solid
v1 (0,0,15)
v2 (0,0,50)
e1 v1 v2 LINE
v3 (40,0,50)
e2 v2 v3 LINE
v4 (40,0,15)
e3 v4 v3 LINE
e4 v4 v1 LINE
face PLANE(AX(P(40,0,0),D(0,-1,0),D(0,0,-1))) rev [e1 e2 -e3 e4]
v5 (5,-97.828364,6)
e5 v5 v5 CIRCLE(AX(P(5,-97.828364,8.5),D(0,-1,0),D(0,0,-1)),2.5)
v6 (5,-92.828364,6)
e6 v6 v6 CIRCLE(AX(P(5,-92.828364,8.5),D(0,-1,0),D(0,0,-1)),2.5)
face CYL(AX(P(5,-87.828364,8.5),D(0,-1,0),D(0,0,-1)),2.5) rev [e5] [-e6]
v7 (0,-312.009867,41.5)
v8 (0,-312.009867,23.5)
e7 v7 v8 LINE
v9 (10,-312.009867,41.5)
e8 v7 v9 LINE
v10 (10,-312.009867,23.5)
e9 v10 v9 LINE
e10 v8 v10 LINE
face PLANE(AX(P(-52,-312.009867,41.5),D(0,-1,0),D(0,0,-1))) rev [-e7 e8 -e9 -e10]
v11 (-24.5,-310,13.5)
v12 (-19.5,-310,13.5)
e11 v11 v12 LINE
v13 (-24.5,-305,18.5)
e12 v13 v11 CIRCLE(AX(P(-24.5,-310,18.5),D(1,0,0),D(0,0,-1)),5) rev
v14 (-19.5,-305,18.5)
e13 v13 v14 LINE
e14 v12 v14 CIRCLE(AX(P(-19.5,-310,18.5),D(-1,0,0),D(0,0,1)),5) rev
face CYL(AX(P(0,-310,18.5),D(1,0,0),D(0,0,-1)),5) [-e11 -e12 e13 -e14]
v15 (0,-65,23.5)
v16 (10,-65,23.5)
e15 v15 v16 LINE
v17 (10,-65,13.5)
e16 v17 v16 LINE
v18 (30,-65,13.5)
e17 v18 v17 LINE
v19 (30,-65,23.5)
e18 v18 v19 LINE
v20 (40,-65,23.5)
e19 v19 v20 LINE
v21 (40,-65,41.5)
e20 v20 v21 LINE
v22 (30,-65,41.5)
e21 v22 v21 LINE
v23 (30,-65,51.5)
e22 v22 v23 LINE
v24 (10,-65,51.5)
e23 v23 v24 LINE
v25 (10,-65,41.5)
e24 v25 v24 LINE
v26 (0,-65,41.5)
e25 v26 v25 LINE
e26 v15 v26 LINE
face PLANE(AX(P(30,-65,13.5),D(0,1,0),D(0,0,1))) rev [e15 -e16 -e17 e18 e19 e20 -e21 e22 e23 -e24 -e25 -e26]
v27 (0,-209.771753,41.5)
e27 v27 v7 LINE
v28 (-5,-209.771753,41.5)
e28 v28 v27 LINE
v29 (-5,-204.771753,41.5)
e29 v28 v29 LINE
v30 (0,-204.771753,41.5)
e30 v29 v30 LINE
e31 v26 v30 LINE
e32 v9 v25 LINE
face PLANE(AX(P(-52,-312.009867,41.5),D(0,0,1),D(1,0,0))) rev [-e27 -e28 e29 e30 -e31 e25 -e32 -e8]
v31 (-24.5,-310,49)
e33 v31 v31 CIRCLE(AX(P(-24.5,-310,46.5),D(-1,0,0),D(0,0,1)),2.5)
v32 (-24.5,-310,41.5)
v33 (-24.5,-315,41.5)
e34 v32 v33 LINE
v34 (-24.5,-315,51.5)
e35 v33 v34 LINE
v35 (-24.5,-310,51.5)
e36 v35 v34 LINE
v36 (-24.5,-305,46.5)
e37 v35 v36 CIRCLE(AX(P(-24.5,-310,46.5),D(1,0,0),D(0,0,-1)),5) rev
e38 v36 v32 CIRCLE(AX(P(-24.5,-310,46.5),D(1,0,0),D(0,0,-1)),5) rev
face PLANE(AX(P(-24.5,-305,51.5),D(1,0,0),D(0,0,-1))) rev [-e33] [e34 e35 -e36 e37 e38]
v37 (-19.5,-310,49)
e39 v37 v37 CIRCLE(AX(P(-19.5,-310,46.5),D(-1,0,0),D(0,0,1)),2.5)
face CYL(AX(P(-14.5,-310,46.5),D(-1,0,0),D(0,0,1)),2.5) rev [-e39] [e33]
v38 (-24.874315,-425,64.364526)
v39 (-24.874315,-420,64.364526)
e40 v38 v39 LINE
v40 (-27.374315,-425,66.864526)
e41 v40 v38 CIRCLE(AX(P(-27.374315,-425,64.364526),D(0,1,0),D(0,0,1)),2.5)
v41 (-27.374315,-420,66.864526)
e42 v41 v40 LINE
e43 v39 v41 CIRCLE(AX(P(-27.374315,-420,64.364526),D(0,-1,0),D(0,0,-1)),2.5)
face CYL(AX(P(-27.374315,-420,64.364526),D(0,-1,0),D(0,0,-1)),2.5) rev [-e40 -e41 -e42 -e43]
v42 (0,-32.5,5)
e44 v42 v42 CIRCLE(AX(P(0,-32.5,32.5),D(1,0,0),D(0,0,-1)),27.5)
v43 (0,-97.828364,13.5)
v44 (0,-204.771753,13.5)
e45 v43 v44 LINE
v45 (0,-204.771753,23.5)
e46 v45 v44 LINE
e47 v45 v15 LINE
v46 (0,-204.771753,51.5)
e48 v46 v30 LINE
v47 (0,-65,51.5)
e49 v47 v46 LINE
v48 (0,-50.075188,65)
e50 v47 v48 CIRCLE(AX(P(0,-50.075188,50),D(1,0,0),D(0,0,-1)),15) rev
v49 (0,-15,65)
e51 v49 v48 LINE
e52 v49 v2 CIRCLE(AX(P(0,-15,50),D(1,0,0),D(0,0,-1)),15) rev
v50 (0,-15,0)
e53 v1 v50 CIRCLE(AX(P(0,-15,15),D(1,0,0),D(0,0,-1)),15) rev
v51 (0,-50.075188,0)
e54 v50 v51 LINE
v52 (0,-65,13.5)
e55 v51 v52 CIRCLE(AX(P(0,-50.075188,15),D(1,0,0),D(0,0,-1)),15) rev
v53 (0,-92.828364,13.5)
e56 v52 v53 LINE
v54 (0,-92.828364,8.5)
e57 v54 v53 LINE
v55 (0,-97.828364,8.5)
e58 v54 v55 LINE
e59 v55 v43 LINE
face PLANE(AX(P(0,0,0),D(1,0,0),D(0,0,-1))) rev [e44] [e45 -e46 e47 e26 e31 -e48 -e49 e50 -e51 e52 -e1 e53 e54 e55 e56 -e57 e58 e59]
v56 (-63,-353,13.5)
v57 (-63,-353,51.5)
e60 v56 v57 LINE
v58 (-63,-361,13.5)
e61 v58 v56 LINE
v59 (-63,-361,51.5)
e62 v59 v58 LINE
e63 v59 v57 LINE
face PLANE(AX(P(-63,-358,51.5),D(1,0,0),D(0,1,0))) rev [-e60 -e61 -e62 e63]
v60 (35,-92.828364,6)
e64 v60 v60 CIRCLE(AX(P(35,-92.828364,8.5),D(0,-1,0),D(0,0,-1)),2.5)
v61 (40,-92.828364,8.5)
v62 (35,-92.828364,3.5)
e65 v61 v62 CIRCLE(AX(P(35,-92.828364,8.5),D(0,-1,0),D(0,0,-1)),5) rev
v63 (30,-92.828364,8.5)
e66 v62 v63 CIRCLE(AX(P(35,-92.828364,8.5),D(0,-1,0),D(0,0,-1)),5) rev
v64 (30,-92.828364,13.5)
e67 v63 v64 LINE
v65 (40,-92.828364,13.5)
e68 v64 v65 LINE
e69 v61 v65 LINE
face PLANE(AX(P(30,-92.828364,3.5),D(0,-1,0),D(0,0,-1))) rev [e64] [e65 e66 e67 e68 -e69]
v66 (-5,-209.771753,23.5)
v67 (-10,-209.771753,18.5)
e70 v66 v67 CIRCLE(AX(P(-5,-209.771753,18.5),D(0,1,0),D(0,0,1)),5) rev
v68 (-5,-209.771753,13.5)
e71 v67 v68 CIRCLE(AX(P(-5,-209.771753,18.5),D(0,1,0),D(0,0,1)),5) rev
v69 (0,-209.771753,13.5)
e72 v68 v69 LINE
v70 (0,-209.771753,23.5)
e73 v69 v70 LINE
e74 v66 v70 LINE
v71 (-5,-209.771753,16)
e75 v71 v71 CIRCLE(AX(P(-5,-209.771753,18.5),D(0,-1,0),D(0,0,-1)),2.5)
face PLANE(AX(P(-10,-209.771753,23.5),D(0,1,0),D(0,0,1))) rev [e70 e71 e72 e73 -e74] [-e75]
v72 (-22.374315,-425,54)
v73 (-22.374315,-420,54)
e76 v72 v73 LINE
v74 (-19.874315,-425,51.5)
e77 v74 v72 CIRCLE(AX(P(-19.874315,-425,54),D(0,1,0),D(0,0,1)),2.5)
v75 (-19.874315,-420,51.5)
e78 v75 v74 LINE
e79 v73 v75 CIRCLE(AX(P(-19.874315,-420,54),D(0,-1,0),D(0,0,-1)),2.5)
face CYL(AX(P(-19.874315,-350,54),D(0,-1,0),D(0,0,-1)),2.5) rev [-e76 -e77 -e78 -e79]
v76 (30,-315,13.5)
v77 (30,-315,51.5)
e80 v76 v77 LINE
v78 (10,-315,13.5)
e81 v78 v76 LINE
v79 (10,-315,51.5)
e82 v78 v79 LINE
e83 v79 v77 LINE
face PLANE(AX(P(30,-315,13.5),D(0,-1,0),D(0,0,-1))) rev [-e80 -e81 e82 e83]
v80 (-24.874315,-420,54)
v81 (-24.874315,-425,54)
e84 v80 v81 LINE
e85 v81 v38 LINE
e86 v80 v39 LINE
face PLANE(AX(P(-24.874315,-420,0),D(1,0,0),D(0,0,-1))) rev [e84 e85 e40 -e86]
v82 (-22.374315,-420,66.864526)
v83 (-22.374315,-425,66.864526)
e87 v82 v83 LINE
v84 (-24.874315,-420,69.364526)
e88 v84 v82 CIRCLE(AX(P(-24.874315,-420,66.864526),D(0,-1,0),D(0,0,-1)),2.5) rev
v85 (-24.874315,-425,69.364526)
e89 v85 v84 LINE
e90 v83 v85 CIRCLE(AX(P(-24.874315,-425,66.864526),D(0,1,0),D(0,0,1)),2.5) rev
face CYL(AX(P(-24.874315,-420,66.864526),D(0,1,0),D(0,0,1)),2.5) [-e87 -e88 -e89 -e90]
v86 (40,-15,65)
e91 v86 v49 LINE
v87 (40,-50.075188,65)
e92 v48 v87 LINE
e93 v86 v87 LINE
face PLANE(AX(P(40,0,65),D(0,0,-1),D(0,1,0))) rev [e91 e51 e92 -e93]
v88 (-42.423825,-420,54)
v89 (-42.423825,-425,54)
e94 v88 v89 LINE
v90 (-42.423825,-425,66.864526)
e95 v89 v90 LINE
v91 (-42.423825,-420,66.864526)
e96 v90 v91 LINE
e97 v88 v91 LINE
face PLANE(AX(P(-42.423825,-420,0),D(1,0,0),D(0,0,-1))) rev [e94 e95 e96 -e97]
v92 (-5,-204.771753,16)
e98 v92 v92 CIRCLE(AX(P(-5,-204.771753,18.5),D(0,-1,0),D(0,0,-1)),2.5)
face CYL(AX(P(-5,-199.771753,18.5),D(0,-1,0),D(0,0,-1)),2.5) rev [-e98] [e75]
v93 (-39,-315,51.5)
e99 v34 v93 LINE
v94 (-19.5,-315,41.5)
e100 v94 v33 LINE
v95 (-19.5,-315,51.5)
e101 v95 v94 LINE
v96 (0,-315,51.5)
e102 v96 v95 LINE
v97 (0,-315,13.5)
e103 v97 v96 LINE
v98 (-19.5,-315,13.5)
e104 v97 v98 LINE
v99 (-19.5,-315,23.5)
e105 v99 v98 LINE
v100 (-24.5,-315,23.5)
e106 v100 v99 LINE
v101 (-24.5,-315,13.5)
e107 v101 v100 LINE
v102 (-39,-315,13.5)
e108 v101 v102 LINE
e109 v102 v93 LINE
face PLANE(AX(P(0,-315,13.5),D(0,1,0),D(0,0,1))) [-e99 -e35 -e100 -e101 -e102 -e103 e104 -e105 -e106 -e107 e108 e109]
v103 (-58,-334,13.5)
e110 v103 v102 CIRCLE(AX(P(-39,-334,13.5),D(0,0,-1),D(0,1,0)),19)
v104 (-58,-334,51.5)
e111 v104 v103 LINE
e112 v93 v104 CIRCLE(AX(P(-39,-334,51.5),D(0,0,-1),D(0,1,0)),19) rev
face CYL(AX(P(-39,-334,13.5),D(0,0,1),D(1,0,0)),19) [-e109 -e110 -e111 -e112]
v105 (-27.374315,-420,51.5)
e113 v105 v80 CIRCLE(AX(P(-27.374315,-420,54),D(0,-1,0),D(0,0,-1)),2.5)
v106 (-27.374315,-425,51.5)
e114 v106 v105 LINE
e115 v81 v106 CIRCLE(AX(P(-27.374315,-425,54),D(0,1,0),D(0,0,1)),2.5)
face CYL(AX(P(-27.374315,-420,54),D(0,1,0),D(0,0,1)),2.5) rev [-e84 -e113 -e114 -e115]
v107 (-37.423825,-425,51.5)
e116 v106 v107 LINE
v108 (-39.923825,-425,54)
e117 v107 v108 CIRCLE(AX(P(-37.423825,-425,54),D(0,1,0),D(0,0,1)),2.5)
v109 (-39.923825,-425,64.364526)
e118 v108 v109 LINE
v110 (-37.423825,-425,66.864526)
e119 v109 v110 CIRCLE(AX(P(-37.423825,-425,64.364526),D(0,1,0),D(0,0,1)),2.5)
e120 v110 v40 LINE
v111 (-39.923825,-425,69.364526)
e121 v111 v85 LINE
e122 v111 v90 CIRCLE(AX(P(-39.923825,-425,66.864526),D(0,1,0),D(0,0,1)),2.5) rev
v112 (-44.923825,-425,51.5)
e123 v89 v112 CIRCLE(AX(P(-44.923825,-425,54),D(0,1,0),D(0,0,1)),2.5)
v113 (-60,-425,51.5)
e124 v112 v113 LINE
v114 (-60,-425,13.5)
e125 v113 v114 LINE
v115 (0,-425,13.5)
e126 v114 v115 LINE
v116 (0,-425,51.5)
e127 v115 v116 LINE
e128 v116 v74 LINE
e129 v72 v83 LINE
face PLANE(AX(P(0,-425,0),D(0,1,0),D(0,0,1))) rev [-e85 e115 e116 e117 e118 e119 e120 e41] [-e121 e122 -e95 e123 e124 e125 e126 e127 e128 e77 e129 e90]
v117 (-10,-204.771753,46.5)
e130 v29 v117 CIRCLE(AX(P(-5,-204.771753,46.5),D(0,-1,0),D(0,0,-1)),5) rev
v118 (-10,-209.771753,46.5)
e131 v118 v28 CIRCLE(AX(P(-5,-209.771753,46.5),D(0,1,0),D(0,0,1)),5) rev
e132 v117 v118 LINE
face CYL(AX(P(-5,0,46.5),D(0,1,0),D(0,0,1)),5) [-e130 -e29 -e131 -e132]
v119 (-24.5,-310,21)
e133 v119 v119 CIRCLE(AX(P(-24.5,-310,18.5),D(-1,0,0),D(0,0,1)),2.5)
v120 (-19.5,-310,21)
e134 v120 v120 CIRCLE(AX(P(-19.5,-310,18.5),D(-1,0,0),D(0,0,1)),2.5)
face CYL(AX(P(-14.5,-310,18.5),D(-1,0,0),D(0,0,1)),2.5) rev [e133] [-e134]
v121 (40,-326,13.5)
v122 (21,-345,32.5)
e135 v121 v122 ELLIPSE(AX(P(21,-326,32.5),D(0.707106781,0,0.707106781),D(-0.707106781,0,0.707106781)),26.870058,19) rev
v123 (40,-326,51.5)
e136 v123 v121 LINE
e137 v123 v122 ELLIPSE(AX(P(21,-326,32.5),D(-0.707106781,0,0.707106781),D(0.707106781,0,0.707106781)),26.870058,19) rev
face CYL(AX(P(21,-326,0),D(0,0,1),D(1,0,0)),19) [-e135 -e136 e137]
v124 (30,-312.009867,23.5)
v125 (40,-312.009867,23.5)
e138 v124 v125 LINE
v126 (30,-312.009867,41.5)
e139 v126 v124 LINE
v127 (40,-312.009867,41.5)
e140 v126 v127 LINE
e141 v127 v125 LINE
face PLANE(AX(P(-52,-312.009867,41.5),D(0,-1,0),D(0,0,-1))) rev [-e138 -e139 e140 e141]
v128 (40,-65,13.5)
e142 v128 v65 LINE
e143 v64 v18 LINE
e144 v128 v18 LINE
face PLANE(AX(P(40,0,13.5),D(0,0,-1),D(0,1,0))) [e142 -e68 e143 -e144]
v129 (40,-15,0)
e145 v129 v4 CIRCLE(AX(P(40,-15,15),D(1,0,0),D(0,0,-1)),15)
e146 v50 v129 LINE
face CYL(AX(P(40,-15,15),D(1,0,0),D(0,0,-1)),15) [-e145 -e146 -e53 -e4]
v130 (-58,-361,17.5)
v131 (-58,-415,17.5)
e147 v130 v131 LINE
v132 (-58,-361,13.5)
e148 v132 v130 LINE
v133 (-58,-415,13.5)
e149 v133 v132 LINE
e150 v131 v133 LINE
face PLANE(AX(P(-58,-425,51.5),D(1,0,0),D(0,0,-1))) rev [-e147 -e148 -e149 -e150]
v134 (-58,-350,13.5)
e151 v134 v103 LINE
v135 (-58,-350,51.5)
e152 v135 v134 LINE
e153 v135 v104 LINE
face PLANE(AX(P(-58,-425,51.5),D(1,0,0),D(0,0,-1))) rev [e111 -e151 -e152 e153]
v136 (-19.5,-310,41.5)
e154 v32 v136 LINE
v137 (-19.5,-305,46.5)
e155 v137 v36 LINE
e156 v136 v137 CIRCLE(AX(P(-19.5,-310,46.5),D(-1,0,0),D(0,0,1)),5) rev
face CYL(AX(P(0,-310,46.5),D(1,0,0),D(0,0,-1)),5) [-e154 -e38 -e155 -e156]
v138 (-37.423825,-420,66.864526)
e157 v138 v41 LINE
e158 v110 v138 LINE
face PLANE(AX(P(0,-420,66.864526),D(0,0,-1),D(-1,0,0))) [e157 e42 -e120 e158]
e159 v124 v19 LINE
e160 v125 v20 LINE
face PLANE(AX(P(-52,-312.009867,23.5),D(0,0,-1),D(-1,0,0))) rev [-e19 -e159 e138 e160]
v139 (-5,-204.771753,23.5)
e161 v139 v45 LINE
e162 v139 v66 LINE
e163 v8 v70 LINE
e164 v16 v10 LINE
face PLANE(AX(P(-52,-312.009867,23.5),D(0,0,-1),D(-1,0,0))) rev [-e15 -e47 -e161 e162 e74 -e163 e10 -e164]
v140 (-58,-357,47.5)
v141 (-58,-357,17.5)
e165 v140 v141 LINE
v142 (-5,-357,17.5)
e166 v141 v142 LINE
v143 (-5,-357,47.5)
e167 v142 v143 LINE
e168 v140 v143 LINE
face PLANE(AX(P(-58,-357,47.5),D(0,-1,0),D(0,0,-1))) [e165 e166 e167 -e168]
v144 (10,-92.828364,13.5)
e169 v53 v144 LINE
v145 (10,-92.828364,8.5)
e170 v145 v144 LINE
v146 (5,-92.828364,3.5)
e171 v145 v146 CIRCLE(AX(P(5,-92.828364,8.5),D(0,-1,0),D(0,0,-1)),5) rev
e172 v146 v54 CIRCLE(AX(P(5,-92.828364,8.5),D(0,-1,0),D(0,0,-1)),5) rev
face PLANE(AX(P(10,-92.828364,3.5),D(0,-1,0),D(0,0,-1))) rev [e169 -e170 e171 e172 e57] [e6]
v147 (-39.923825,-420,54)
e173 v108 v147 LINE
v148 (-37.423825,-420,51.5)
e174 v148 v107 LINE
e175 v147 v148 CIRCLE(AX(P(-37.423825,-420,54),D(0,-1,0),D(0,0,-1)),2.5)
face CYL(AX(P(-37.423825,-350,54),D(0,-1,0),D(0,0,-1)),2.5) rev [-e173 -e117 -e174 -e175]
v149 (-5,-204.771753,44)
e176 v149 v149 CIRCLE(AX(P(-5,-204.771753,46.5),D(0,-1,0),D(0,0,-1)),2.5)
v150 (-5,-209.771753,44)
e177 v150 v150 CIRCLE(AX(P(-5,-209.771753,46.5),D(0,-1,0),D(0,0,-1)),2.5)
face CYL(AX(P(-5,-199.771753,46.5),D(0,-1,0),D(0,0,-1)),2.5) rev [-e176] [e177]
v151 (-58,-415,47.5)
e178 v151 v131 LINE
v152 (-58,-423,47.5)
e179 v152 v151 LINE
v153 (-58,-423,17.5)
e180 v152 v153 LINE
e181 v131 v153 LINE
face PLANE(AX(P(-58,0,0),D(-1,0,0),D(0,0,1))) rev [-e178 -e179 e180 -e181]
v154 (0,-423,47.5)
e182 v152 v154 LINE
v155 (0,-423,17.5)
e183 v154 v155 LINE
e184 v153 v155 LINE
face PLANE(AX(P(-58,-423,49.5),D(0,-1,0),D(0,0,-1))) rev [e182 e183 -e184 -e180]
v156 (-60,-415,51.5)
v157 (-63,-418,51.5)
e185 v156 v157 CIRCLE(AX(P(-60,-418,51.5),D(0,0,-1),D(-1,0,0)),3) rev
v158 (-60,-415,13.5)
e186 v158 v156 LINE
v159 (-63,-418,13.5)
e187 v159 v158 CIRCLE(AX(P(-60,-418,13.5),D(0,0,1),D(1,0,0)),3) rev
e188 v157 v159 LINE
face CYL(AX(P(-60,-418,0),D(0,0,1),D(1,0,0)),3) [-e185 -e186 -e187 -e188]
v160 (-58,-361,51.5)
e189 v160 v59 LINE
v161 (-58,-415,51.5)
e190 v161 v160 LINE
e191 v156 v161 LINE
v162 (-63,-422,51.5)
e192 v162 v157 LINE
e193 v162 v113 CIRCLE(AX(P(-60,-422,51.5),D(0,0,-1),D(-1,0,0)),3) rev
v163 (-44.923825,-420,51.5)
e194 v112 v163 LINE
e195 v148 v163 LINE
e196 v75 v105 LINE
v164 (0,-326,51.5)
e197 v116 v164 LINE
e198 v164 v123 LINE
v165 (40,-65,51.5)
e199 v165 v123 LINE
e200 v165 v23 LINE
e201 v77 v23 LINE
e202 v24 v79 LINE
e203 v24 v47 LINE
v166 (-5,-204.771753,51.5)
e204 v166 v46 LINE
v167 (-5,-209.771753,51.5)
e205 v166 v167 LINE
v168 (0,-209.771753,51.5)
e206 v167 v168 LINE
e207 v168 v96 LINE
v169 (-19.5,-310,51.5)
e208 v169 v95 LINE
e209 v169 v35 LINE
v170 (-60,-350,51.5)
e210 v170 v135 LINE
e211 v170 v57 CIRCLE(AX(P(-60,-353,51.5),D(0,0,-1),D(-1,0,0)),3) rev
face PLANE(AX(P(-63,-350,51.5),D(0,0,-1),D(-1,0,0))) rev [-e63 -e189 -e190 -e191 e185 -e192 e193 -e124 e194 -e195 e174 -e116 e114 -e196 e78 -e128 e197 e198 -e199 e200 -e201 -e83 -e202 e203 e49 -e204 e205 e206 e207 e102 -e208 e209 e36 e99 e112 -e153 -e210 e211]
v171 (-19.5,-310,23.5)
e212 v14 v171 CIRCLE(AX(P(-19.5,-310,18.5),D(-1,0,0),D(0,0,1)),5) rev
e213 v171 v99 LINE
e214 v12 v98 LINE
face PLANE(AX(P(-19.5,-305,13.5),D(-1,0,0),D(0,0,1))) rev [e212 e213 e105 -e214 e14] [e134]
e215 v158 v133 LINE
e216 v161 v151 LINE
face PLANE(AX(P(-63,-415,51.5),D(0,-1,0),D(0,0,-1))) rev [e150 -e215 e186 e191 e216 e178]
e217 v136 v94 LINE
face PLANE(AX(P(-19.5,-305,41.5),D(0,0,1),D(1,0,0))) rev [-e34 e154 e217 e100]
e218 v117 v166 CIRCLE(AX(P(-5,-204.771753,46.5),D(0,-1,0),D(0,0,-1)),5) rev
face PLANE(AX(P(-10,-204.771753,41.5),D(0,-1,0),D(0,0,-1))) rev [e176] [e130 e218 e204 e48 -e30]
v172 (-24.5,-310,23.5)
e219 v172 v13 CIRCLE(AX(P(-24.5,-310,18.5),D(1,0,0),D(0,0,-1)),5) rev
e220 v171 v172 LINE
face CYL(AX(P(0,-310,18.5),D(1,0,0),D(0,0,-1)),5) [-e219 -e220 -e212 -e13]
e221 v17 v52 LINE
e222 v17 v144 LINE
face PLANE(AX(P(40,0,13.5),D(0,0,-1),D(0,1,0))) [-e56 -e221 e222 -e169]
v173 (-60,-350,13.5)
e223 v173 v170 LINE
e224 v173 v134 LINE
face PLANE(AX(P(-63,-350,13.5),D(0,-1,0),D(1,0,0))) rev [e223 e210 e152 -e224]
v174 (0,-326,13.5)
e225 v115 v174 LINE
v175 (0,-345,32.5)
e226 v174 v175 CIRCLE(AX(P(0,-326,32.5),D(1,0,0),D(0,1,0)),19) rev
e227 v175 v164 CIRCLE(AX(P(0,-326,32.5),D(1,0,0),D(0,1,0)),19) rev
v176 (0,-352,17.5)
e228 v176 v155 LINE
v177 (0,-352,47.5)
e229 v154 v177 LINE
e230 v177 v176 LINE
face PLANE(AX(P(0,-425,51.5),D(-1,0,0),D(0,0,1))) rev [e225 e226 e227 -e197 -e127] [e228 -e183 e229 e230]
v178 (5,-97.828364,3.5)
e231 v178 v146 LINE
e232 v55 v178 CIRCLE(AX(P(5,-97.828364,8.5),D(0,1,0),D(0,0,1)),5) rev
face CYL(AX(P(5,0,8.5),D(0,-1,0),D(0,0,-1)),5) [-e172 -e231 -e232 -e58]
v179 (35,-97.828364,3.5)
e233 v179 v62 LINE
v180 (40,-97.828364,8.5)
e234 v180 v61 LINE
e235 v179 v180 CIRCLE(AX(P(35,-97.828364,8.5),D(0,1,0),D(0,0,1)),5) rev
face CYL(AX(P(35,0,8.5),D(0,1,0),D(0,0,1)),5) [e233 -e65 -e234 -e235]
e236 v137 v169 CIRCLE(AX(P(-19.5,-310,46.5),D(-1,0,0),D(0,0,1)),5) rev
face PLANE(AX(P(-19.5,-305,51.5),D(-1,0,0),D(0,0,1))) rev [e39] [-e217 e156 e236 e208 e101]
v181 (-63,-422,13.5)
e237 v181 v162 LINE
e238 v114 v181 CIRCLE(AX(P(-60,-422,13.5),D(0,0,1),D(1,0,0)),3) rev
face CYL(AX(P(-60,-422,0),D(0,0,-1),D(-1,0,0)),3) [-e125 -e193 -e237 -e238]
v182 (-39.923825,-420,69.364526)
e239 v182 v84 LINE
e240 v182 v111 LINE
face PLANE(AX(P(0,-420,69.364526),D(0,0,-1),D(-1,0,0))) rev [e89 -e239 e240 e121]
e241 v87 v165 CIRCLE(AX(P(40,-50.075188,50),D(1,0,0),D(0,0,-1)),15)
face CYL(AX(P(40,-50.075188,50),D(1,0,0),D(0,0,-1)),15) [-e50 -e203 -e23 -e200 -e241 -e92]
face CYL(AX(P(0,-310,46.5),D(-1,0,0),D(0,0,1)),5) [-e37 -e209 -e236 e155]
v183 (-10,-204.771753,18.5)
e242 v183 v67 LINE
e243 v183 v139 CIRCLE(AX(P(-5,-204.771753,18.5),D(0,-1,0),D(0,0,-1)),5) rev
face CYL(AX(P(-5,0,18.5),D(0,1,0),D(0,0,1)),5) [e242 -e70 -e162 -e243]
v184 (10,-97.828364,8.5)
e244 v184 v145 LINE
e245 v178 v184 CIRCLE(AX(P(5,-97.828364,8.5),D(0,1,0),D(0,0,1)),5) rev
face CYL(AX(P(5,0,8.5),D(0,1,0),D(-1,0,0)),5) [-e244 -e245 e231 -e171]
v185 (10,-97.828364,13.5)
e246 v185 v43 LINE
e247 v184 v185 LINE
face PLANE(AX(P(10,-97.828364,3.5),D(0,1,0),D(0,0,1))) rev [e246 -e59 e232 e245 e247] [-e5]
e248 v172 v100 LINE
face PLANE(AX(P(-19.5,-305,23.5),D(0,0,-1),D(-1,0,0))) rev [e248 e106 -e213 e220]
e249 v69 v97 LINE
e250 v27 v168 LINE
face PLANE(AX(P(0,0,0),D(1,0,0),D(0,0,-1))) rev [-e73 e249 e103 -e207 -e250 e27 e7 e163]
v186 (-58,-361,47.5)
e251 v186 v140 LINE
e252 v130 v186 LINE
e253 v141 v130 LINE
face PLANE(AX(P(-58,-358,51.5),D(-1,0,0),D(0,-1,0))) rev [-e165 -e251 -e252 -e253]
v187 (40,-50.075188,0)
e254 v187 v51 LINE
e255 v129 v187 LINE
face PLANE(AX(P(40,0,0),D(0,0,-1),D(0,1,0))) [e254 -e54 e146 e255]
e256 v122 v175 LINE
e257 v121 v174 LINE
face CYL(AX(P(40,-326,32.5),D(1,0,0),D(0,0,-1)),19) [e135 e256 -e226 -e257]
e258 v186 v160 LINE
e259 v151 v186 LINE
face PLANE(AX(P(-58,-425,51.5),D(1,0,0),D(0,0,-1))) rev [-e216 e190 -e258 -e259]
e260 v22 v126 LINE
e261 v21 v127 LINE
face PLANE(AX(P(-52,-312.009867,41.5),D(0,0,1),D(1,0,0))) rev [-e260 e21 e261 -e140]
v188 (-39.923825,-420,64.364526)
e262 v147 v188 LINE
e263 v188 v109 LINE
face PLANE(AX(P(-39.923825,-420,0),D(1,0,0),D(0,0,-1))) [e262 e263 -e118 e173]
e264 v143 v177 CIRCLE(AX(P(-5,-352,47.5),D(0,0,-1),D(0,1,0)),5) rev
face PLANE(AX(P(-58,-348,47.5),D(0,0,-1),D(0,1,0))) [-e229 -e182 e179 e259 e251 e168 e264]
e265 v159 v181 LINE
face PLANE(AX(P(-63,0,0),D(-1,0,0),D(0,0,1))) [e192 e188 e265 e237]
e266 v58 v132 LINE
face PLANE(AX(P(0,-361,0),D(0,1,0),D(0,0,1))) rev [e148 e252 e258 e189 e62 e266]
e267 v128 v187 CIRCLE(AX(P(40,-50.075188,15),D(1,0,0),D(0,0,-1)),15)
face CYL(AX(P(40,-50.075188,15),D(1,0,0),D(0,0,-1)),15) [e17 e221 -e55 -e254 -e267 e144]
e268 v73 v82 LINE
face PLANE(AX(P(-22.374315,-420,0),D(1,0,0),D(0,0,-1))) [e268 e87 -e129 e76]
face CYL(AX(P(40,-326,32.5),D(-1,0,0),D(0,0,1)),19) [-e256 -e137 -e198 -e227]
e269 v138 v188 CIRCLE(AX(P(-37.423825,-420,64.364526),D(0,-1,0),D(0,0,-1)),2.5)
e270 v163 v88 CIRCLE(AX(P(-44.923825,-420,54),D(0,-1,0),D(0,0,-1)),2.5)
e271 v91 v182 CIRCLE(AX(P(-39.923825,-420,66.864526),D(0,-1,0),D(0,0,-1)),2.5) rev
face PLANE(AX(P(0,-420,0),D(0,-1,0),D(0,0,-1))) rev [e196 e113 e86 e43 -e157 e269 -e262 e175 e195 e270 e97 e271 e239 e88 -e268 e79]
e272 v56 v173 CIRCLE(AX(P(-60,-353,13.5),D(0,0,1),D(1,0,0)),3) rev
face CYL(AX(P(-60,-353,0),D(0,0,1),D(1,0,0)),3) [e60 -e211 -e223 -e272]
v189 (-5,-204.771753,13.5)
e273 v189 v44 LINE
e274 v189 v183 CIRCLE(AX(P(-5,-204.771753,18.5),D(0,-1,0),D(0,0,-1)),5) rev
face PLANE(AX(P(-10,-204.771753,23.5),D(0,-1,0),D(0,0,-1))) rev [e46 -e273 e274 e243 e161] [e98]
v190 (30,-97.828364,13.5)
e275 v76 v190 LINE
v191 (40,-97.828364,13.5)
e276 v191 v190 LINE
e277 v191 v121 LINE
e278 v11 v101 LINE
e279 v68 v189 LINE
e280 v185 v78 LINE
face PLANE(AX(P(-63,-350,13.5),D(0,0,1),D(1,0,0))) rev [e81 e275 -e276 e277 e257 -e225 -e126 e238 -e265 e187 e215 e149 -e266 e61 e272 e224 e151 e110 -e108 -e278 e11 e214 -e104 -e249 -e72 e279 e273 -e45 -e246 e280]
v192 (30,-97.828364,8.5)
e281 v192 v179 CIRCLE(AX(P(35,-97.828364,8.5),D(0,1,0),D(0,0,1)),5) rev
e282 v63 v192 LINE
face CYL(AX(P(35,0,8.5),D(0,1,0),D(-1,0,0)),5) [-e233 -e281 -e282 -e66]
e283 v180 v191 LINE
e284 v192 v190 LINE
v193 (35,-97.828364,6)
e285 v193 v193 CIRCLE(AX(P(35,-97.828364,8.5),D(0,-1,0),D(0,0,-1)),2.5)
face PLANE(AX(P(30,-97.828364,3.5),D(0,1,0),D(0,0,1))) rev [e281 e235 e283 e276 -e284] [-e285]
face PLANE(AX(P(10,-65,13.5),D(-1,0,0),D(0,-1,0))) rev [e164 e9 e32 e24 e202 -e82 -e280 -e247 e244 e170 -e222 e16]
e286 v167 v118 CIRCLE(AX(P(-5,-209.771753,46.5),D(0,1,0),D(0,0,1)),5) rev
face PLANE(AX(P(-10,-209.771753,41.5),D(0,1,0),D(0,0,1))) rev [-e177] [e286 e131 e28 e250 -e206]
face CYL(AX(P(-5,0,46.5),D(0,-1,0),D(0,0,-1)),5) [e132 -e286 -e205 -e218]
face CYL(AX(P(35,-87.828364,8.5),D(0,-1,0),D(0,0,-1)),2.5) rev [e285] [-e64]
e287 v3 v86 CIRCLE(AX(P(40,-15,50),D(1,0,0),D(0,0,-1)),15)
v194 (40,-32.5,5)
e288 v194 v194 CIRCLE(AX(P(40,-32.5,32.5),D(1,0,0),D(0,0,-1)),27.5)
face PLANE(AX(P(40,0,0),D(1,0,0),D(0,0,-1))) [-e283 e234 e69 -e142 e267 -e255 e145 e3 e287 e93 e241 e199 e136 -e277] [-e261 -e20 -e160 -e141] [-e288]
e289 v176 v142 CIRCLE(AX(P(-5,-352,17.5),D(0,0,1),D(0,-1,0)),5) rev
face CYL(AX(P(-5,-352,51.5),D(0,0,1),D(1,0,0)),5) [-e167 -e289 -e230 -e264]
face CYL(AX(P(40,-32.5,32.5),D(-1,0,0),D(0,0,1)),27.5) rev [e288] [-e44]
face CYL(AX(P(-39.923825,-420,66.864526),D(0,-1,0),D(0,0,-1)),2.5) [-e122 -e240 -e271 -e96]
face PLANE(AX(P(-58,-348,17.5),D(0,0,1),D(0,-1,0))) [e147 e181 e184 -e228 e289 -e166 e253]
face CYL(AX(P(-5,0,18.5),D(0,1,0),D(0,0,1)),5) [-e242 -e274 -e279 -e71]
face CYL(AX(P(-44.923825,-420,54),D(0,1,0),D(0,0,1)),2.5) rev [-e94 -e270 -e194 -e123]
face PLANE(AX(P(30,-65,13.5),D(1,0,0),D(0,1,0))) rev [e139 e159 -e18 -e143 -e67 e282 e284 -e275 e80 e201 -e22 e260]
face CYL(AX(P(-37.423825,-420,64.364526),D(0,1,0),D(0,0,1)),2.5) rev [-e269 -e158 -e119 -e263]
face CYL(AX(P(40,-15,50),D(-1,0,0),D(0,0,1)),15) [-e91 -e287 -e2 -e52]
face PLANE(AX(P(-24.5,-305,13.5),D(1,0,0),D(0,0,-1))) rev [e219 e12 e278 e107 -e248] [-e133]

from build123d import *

# Parameters (mm, degrees)
SKETCH1_W              = 65
SKETCH1_H              = 65
SKETCH1_R              = 27.5
SKETCH1_W_2            = 38
SKETCH1_H_2            = 280
BOSS_EXTRUDE1_DEPTH    = 40
FILLET1_R              = 15
SKETCH2_W              = 58
SKETCH2_H              = 100
BOSS_EXTRUDE2_DEPTH    = 38
FILLET2_R              = 19
SKETCH3_W              = 20
SKETCH3_H              = 250
CUT_EXTRUDE1_DEPTH     = 38
SKETCH4_W              = 18
SKETCH4_H              = 247.009867417
CUT_EXTRUDE2_DEPTH     = 92
SKETCH5_W              = 28
SKETCH5_H              = 60
CUT_EXTRUDE3_DEPTH     = 58
SKETCH6_W              = 38
SKETCH6_H              = 3
BOSS_EXTRUDE11_DEPTH   = 5
BOSS_EXTRUDE11_2_DEPTH = 5
FILLET3_R              = 3
FILLET4_R              = 3
SKETCH7_W              = 10
SKETCH7_H              = 5
BOSS_EXTRUDE14_DEPTH   = 10
SKETCH8_R              = 2.5
CUT_EXTRUDE4_DEPTH     = 10
FILLET5_R              = 5
SKETCH9_W              = 10
SKETCH9_H              = 5
BOSS_EXTRUDE15_DEPTH   = 10
FILLET6_R              = 5
SKETCH10_R             = 2.5
CUT_EXTRUDE5_DEPTH     = 10
SKETCH11_W             = 5
SKETCH11_H             = 10
BOSS_EXTRUDE16_DEPTH   = 10
FILLET7_R              = 5
SKETCH12_R             = 2.5
CUT_EXTRUDE7_DEPTH     = 10
FILLET9_R              = 2
SKETCH13_W             = 35.831314296
SKETCH13_H             = 60.586089769
CUT_EXTRUDE8_DEPTH     = 10
SKETCH14_W             = 58
SKETCH14_H             = 38
CUT_EXTRUDE9_DEPTH     = 70
SKETCH15_W             = 58
SKETCH15_H             = 38
BOSS_EXTRUDE17_DEPTH   = 80
SKETCH16_W             = 34
SKETCH16_H             = 70
CUT_EXTRUDE10_DEPTH    = 58
SKETCH17_W             = 5
SKETCH17_H             = 38
BOSS_EXTRUDE18_DEPTH   = 5
SKETCH18_W             = 38
SKETCH18_H             = 10
BOSS_EXTRUDE19_DEPTH   = 5
FILLET10_R             = 3
FILLET11_R             = 5
SKETCH19_W             = 2
SKETCH19_H             = 75
BOSS_EXTRUDE22_DEPTH   = 58
SKETCH26_W             = 30
SKETCH26_H             = 9
BOSS_EXTRUDE23_DEPTH   = 58
FILLET12_R             = 5
SKETCH27_W             = 5
SKETCH27_H             = 38
BOSS_EXTRUDE24_DEPTH   = 3
BOSS_EXTRUDE26_DEPTH   = 5
FILLET13_R             = 2.5
FILLET14_R             = 2.5


# Some blends are built 0.0001 mm under size
with BuildPart() as part:
    # Sketch1 → Boss-Extrude1 (new body)
    # profile 1 of 2: a face of its own
    with BuildSketch(Plane(origin=(0, 0, 0), x_dir=(0, 0, -1), z_dir=(1, 0, 0))):
        with Locations((-32.5, -32.5)):
            Rectangle(SKETCH1_W, SKETCH1_H)
        with Locations((-32.5, -32.5)):
            Circle(SKETCH1_R, mode=Mode.SUBTRACT)
    # profile 2 of 2: a face of its own
    with BuildSketch(Plane(origin=(0, 0, 0), x_dir=(0, 0, -1), z_dir=(1, 0, 0))):
        with Locations((-32.5, -205)):
            Rectangle(SKETCH1_W_2, SKETCH1_H_2)
    extrude(amount=BOSS_EXTRUDE1_DEPTH)

    # Fillet1
    # the kernel refuses this fillet: 15 mm, written as the material it takes off along each edge
    with BuildSketch(Plane(origin=(-37.312028891, -65, 0), x_dir=(0, 1, 0), z_dir=(1, 0, 0))) as fillet1_piece_1:
        with BuildLine():
            CenterArc((14.924811557, 15), FILLET1_R, 185.739170477, 84.260829523)
            Line((0, 13.5), (-0.298496231, 13.47))
            ThreePointArc((-0.298496231, 13.47), (-0.3, 6.75), (-0.3, 0))
            Line((-0.3, 0), (0, -0.3))
            Line((0, -0.3), (14.924811557, -0.3))
            Line((14.924811557, -0.3), (14.924811557, 0))
        make_face()
    extrude(amount=114.624057783, mode=Mode.SUBTRACT)
    with BuildSketch(Plane(origin=(-37.312028891, -65, 65), x_dir=(0, 1, 0), z_dir=(1, 0, 0))) as fillet1_piece_2:
        with BuildLine():
            CenterArc((14.924811557, -15), FILLET1_R, 90, 84.260829523)
            Line((0, -13.5), (-0.298496231, -13.47))
            ThreePointArc((-0.298496231, -13.47), (-0.3, -6.75), (-0.3, 0))
            Line((-0.3, 0), (0, 0.3))
            Line((0, 0.3), (14.924811557, 0.3))
            Line((14.924811557, 0.3), (14.924811557, 0))
        make_face()
    extrude(amount=114.624057783, mode=Mode.SUBTRACT)
    with BuildSketch(Plane(origin=(-37.5, 0, 0), x_dir=(0, 0, 1), z_dir=(1, 0, 0))) as fillet1_piece_3:
        with BuildLine():
            CenterArc((FILLET1_R, FILLET1_R), FILLET1_R, 180, 90)
            Line((0, FILLET1_R), (-FILLET1_R * 0.02, FILLET1_R))
            Line((-FILLET1_R * 0.02, FILLET1_R), (-FILLET1_R * 0.02, -FILLET1_R * 0.02))
            Line((-FILLET1_R * 0.02, -FILLET1_R * 0.02), (FILLET1_R, -FILLET1_R * 0.02))
            Line((FILLET1_R, -FILLET1_R * 0.02), (FILLET1_R, 0))
        make_face()
    extrude(amount=115, mode=Mode.SUBTRACT)
    with BuildSketch(Plane(origin=(-37.5, 0, 65), x_dir=(0, 0, -1), z_dir=(1, 0, 0))) as fillet1_piece_4:
        with BuildLine():
            CenterArc((FILLET1_R, -FILLET1_R), FILLET1_R, 90, 90)
            Line((0, -FILLET1_R), (-FILLET1_R * 0.02, -FILLET1_R))
            Line((-FILLET1_R * 0.02, -FILLET1_R), (-FILLET1_R * 0.02, FILLET1_R * 0.02))
            Line((-FILLET1_R * 0.02, FILLET1_R * 0.02), (FILLET1_R, FILLET1_R * 0.02))
            Line((FILLET1_R, FILLET1_R * 0.02), (FILLET1_R, 0))
        make_face()
    extrude(amount=115, mode=Mode.SUBTRACT)

    # Sketch2 → Boss-Extrude2 (add)
    with BuildSketch(Plane.XY.offset(51.5)):
        with Locations((-29, -365)):
            Rectangle(SKETCH2_W, SKETCH2_H)
    extrude(amount=-BOSS_EXTRUDE2_DEPTH)

    # Fillet2
    # the kernel refuses this fillet: 19 mm, written as the material it adds along each edge
    # the kernel refuses this fillet: 19 mm, written as the material it takes off along each edge
    with BuildSketch(Plane(origin=(0, -345, 13.5), x_dir=(0, 1, 0), z_dir=(1, 0, 0))) as fillet2_2_piece_1:
        with BuildLine():
            CenterArc((FILLET2_R, FILLET2_R), FILLET2_R, 180, 90)
            Line((0, FILLET2_R), (0, 0))
            Line((0, 0), (FILLET2_R, 0))
        make_face()
    extrude(amount=87.5, mode=Mode.SUBTRACT)
    with BuildSketch(Plane(origin=(0, -345, 51.5), x_dir=(0, 1, 0), z_dir=(1, 0, 0))) as fillet2_2_piece_2:
        with BuildLine():
            CenterArc((FILLET2_R, -FILLET2_R), FILLET2_R, 90, 90)
            Line((0, -FILLET2_R), (0, 0))
            Line((0, 0), (FILLET2_R, 0))
        make_face()
    extrude(amount=87.5, mode=Mode.SUBTRACT)
    with BuildSketch(Plane(origin=(40, -345, -34), x_dir=(0, 1, 0), z_dir=(0, 0, 1)), Plane(origin=(-58, -315, 99), x_dir=(1, 0, 0), z_dir=(0, 0, -1))) as fillet2_2_piece_3:
        with BuildLine():
            CenterArc((FILLET2_R, FILLET2_R), FILLET2_R, 180, 90)
            Line((0, FILLET2_R), (0, 0))
            Line((0, 0), (FILLET2_R, 0))
        make_face()
    extrude(amount=133, mode=Mode.SUBTRACT)

    # Sketch3 → Cut-Extrude1 (cut)
    with BuildSketch(Plane.XY.offset(51.5)):
        with Locations((20, -190)):
            Rectangle(SKETCH3_W, SKETCH3_H)
    extrude(amount=-CUT_EXTRUDE1_DEPTH, mode=Mode.SUBTRACT)

    # Sketch4 → Cut-Extrude2 (cut)
    with BuildSketch(Plane(origin=(40, 0, 0), x_dir=(0, 0, -1), z_dir=(1, 0, 0))):
        with Locations((-32.5, -188.504933709)):
            Rectangle(SKETCH4_W, SKETCH4_H)
    extrude(amount=-CUT_EXTRUDE2_DEPTH, mode=Mode.SUBTRACT)

    # Sketch5 → Cut-Extrude3 (cut)
    with BuildSketch(Plane(origin=(0, 0, 0), x_dir=(0, 0, -1), z_dir=(1, 0, 0))):
        with Locations((-32.5, -380)):
            Rectangle(SKETCH5_W, SKETCH5_H)
    extrude(amount=-CUT_EXTRUDE3_DEPTH, mode=Mode.SUBTRACT)

    # Sketch7 → Boss-Extrude14 (add)
    with BuildSketch(Plane.ZY):
        with Locations((18.5, -207.271752894)):
            Rectangle(SKETCH7_W, SKETCH7_H)
        with Locations((46.5, -207.271752894)):
            Rectangle(SKETCH7_W, SKETCH7_H)
    extrude(amount=BOSS_EXTRUDE14_DEPTH)

    # Sketch8 → Cut-Extrude4 (cut)
    with BuildSketch(Plane.XZ.offset(209.771752894)):
        with Locations(Location((-5, 18.5, 0), (0, 0, 270))):
            Circle(SKETCH8_R)
        with Locations(Location((-5, 46.5, 0), (0, 0, 270))):
            Circle(SKETCH8_R)
    extrude(amount=-CUT_EXTRUDE4_DEPTH, mode=Mode.SUBTRACT)

    # Fillet5
    fillet5_edges = [part.edges().sort_by_distance(p)[0] for p in [
        (-10, -207.271752894, 23.5),
        (-10, -207.271752894, 51.5),
        (-10, -207.271752894, 41.5),
        (-10, -207.271752894, 13.5),
    ]]
    fillet(fillet5_edges, radius=FILLET5_R - 0.0001)  # a hair under: the kernel refuses the full size

    # Sketch9 → Boss-Extrude15 (add)
    with BuildSketch(Plane(origin=(0, 0, 13.5), x_dir=(-1, 0, 0), z_dir=(0, 0, -1))):
        with Locations((-35, -95.328363794)):
            Rectangle(SKETCH9_W, SKETCH9_H)
        with Locations((-5, -95.328363794)):
            Rectangle(SKETCH9_W, SKETCH9_H)
    extrude(amount=BOSS_EXTRUDE15_DEPTH)

    # Fillet6
    fillet6_edges = [part.edges().sort_by_distance(p)[0] for p in [
        (40, -95.328363794, 3.5),
        (30, -95.328363794, 3.5),
        (10, -95.328363794, 3.5),
        (0, -95.328363794, 3.5),
    ]]
    fillet(fillet6_edges, radius=FILLET6_R - 0.0001)  # a hair under: the kernel refuses the full size

    # Sketch10 → Cut-Extrude5 (cut)
    with BuildSketch(Plane(origin=(0, -97.828363794, 0), x_dir=(-1, 0, 0), z_dir=(0, -1, 0))):
        with Locations(Location((-35, -8.5, 0), (0, 0, 90))):
            Circle(SKETCH10_R)
        with Locations(Location((-5, -8.5, 0), (0, 0, 90))):
            Circle(SKETCH10_R)
    extrude(amount=-CUT_EXTRUDE5_DEPTH, mode=Mode.SUBTRACT)

    # Sketch11 → Boss-Extrude16 (add)
    with BuildSketch(Plane(origin=(0, -315, 0), x_dir=(1, 0, 0), z_dir=(0, 1, 0))):
        with Locations((-22, -18.5)):
            Rectangle(SKETCH11_W, SKETCH11_H)
        with Locations((-22, -46.5)):
            Rectangle(SKETCH11_W, SKETCH11_H)
    extrude(amount=BOSS_EXTRUDE16_DEPTH)

    # Fillet7
    fillet7_edges = [part.edges().sort_by_distance(p)[0] for p in [
        (-22, -305, 51.5),
        (-22, -305, 13.5),
        (-22, -305, 41.5),
        (-22, -305, 23.5),
    ]]
    fillet(fillet7_edges, radius=FILLET7_R - 0.0001)  # a hair under: the kernel refuses the full size

    # Sketch12 → Cut-Extrude7 (cut)
    with BuildSketch(Plane.ZY.offset(24.5)):
        with Locations((18.5, -310)):
            Circle(SKETCH12_R)
        with Locations((46.5, -310)):
            Circle(SKETCH12_R)
    extrude(amount=-CUT_EXTRUDE7_DEPTH, mode=Mode.SUBTRACT)

    # Fillet9
    fillet9_edges = [part.edges().sort_by_distance(p)[0] for p in [
        (0, -410, 32.5),
        (0, -350, 32.5),
    ]]
    fillet(fillet9_edges, radius=FILLET9_R)

    # Sketch14 → Cut-Extrude9 (cut)
    with BuildSketch(Plane(origin=(0, -415, 0), x_dir=(-1, 0, 0), z_dir=(0, -1, 0))):
        with Locations((29, -32.5)):
            Rectangle(SKETCH14_W, SKETCH14_H)
    extrude(amount=-CUT_EXTRUDE9_DEPTH, mode=Mode.SUBTRACT)



with BuildPart() as body_2:
    # Sketch6 → Boss-Extrude11 (new body)
    with BuildSketch(Plane.ZY.offset(58)):
        with Locations((32.5, -351.5)):
            Rectangle(SKETCH6_W, SKETCH6_H)
    extrude(amount=BOSS_EXTRUDE11_DEPTH)

    # Fillet3
    fillet3_edges = [body_2.edges().sort_by_distance(p)[0] for p in [
        (-63, -350, 32.5),
    ]]
    fillet(fillet3_edges, radius=FILLET3_R - 0.0001)  # a hair under: the kernel refuses the full size


with BuildPart() as body_3:
    # Sketch6 → Boss-Extrude11 2 (new body)
    with BuildSketch(Plane.ZY.offset(58)):
        with Locations((32.5, -408.5)):
            Rectangle(SKETCH6_W, SKETCH6_H)
    extrude(amount=BOSS_EXTRUDE11_2_DEPTH)

    # Fillet4
    fillet4_edges = [body_3.edges().sort_by_distance(p)[0] for p in [
        (-63, -410, 32.5),
    ]]
    fillet(fillet4_edges, radius=FILLET4_R - 0.0001)  # a hair under: the kernel refuses the full size

    # Sketch13 → Cut-Extrude8 (cut)
    with BuildSketch(Plane.XZ.offset(410)):
        with Locations((-75.915657148, 21.206955116)):
            Rectangle(SKETCH13_W, SKETCH13_H)
    extrude(amount=-CUT_EXTRUDE8_DEPTH, mode=Mode.SUBTRACT)


with BuildPart() as part_1:
    add(part.part)

    add(body_2.part)  # Boss-Extrude17 merges body 2
    # Sketch15 → Boss-Extrude17 (add)
    with BuildSketch(Plane(origin=(0, -345, 0), x_dir=(-1, 0, 0), z_dir=(0, -1, 0))):
        with Locations((29, -32.5)):
            Rectangle(SKETCH15_W, SKETCH15_H)
    extrude(amount=BOSS_EXTRUDE17_DEPTH)

    # Sketch16 → Cut-Extrude10 (cut)
    with BuildSketch(Plane(origin=(0, 0, 0), x_dir=(0, 0, -1), z_dir=(1, 0, 0))):
        with Locations((-32.5, -388)):
            Rectangle(SKETCH16_W, SKETCH16_H)
    extrude(amount=-CUT_EXTRUDE10_DEPTH, mode=Mode.SUBTRACT)

    # Sketch17 → Boss-Extrude18 (add)
    with BuildSketch(Plane.XZ.offset(353)):
        with Locations((-60.5, 32.5)):
            Rectangle(SKETCH17_W, SKETCH17_H)
    extrude(amount=BOSS_EXTRUDE18_DEPTH)

    # Sketch18 → Boss-Extrude19 (add)
    with BuildSketch(Plane.ZY.offset(58)):
        with Locations((32.5, -420)):
            Rectangle(SKETCH18_W, SKETCH18_H)
    extrude(amount=BOSS_EXTRUDE19_DEPTH)

    # Fillet10
    fillet10_edges = [part_1.edges().sort_by_distance(p)[0] for p in [
        (-63, -415, 32.5),
        (-63, -425, 32.5),
    ]]
    fillet(fillet10_edges, radius=FILLET10_R)

    # Fillet11
    fillet11_edges = [part_1.edges().sort_by_distance(p)[0] for p in [
        (0, -353, 32.5),
    ]]
    fillet(fillet11_edges, radius=FILLET11_R)

    # Sketch19 → Boss-Extrude22 (add)
    with BuildSketch(Plane(origin=(0, 0, 0), x_dir=(0, 0, -1), z_dir=(1, 0, 0))):
        with Locations((-48.5, -385.5)):
            Rectangle(SKETCH19_W, SKETCH19_H)
        with Locations((-16.5, -385.5)):
            Rectangle(SKETCH19_W, SKETCH19_H)
    extrude(amount=-BOSS_EXTRUDE22_DEPTH)

    # Sketch26 → Boss-Extrude23 (add)
    with BuildSketch(Plane(origin=(0, 0, 0), x_dir=(0, 0, -1), z_dir=(1, 0, 0))):
        with Locations((-32.5, -352.5)):
            Rectangle(SKETCH26_W, SKETCH26_H)
    extrude(amount=-BOSS_EXTRUDE23_DEPTH)

    # Fillet12
    fillet12_edges = [part_1.edges().sort_by_distance(p)[0] for p in [
        (0, -357, 32.5),
    ]]
    fillet(fillet12_edges, radius=FILLET12_R)

    # Sketch27 → Boss-Extrude24 (add)
    with BuildSketch(Plane.XZ.offset(358)):
        with Locations((-60.5, 32.5)):
            Rectangle(SKETCH27_W, SKETCH27_H)
    extrude(amount=BOSS_EXTRUDE24_DEPTH)

    # Sketch30 → Boss-Extrude26 (add)
    with BuildSketch(Plane(origin=(0, -425, 0), x_dir=(-1, 0, 0), z_dir=(0, -1, 0))):
        Polygon((24.87431458, -51.5), (22.37431458, -51.5), (22.37431458, -69.364525512), (42.423825194, -69.364525512), (42.423825194, -51.5), (39.923825194, -51.5), (39.923825194, -66.864525512), (24.87431458, -66.864525512), align=None)
    extrude(amount=-BOSS_EXTRUDE26_DEPTH)

    # Fillet13
    fillet13_edges = [part_1.edges().sort_by_distance(p)[0] for p in [
        (-24.87431458, -422.5, 51.5),
        (-39.923825194, -422.5, 51.5),
        (-42.423825194, -422.5, 51.5),
        (-42.423825194, -422.5, 69.364525512),
        (-22.37431458, -422.5, 69.364525512),
        (-22.37431458, -422.5, 51.5),
    ]]
    fillet(fillet13_edges, radius=FILLET13_R)

    # Fillet14
    fillet14_edges = [part_1.edges().sort_by_distance(p)[0] for p in [
        (-24.87431458, -422.5, 66.864525512),
        (-39.923825194, -422.5, 66.864525512),
    ]]
    fillet(fillet14_edges, radius=FILLET14_R)


solid = part_1.part
